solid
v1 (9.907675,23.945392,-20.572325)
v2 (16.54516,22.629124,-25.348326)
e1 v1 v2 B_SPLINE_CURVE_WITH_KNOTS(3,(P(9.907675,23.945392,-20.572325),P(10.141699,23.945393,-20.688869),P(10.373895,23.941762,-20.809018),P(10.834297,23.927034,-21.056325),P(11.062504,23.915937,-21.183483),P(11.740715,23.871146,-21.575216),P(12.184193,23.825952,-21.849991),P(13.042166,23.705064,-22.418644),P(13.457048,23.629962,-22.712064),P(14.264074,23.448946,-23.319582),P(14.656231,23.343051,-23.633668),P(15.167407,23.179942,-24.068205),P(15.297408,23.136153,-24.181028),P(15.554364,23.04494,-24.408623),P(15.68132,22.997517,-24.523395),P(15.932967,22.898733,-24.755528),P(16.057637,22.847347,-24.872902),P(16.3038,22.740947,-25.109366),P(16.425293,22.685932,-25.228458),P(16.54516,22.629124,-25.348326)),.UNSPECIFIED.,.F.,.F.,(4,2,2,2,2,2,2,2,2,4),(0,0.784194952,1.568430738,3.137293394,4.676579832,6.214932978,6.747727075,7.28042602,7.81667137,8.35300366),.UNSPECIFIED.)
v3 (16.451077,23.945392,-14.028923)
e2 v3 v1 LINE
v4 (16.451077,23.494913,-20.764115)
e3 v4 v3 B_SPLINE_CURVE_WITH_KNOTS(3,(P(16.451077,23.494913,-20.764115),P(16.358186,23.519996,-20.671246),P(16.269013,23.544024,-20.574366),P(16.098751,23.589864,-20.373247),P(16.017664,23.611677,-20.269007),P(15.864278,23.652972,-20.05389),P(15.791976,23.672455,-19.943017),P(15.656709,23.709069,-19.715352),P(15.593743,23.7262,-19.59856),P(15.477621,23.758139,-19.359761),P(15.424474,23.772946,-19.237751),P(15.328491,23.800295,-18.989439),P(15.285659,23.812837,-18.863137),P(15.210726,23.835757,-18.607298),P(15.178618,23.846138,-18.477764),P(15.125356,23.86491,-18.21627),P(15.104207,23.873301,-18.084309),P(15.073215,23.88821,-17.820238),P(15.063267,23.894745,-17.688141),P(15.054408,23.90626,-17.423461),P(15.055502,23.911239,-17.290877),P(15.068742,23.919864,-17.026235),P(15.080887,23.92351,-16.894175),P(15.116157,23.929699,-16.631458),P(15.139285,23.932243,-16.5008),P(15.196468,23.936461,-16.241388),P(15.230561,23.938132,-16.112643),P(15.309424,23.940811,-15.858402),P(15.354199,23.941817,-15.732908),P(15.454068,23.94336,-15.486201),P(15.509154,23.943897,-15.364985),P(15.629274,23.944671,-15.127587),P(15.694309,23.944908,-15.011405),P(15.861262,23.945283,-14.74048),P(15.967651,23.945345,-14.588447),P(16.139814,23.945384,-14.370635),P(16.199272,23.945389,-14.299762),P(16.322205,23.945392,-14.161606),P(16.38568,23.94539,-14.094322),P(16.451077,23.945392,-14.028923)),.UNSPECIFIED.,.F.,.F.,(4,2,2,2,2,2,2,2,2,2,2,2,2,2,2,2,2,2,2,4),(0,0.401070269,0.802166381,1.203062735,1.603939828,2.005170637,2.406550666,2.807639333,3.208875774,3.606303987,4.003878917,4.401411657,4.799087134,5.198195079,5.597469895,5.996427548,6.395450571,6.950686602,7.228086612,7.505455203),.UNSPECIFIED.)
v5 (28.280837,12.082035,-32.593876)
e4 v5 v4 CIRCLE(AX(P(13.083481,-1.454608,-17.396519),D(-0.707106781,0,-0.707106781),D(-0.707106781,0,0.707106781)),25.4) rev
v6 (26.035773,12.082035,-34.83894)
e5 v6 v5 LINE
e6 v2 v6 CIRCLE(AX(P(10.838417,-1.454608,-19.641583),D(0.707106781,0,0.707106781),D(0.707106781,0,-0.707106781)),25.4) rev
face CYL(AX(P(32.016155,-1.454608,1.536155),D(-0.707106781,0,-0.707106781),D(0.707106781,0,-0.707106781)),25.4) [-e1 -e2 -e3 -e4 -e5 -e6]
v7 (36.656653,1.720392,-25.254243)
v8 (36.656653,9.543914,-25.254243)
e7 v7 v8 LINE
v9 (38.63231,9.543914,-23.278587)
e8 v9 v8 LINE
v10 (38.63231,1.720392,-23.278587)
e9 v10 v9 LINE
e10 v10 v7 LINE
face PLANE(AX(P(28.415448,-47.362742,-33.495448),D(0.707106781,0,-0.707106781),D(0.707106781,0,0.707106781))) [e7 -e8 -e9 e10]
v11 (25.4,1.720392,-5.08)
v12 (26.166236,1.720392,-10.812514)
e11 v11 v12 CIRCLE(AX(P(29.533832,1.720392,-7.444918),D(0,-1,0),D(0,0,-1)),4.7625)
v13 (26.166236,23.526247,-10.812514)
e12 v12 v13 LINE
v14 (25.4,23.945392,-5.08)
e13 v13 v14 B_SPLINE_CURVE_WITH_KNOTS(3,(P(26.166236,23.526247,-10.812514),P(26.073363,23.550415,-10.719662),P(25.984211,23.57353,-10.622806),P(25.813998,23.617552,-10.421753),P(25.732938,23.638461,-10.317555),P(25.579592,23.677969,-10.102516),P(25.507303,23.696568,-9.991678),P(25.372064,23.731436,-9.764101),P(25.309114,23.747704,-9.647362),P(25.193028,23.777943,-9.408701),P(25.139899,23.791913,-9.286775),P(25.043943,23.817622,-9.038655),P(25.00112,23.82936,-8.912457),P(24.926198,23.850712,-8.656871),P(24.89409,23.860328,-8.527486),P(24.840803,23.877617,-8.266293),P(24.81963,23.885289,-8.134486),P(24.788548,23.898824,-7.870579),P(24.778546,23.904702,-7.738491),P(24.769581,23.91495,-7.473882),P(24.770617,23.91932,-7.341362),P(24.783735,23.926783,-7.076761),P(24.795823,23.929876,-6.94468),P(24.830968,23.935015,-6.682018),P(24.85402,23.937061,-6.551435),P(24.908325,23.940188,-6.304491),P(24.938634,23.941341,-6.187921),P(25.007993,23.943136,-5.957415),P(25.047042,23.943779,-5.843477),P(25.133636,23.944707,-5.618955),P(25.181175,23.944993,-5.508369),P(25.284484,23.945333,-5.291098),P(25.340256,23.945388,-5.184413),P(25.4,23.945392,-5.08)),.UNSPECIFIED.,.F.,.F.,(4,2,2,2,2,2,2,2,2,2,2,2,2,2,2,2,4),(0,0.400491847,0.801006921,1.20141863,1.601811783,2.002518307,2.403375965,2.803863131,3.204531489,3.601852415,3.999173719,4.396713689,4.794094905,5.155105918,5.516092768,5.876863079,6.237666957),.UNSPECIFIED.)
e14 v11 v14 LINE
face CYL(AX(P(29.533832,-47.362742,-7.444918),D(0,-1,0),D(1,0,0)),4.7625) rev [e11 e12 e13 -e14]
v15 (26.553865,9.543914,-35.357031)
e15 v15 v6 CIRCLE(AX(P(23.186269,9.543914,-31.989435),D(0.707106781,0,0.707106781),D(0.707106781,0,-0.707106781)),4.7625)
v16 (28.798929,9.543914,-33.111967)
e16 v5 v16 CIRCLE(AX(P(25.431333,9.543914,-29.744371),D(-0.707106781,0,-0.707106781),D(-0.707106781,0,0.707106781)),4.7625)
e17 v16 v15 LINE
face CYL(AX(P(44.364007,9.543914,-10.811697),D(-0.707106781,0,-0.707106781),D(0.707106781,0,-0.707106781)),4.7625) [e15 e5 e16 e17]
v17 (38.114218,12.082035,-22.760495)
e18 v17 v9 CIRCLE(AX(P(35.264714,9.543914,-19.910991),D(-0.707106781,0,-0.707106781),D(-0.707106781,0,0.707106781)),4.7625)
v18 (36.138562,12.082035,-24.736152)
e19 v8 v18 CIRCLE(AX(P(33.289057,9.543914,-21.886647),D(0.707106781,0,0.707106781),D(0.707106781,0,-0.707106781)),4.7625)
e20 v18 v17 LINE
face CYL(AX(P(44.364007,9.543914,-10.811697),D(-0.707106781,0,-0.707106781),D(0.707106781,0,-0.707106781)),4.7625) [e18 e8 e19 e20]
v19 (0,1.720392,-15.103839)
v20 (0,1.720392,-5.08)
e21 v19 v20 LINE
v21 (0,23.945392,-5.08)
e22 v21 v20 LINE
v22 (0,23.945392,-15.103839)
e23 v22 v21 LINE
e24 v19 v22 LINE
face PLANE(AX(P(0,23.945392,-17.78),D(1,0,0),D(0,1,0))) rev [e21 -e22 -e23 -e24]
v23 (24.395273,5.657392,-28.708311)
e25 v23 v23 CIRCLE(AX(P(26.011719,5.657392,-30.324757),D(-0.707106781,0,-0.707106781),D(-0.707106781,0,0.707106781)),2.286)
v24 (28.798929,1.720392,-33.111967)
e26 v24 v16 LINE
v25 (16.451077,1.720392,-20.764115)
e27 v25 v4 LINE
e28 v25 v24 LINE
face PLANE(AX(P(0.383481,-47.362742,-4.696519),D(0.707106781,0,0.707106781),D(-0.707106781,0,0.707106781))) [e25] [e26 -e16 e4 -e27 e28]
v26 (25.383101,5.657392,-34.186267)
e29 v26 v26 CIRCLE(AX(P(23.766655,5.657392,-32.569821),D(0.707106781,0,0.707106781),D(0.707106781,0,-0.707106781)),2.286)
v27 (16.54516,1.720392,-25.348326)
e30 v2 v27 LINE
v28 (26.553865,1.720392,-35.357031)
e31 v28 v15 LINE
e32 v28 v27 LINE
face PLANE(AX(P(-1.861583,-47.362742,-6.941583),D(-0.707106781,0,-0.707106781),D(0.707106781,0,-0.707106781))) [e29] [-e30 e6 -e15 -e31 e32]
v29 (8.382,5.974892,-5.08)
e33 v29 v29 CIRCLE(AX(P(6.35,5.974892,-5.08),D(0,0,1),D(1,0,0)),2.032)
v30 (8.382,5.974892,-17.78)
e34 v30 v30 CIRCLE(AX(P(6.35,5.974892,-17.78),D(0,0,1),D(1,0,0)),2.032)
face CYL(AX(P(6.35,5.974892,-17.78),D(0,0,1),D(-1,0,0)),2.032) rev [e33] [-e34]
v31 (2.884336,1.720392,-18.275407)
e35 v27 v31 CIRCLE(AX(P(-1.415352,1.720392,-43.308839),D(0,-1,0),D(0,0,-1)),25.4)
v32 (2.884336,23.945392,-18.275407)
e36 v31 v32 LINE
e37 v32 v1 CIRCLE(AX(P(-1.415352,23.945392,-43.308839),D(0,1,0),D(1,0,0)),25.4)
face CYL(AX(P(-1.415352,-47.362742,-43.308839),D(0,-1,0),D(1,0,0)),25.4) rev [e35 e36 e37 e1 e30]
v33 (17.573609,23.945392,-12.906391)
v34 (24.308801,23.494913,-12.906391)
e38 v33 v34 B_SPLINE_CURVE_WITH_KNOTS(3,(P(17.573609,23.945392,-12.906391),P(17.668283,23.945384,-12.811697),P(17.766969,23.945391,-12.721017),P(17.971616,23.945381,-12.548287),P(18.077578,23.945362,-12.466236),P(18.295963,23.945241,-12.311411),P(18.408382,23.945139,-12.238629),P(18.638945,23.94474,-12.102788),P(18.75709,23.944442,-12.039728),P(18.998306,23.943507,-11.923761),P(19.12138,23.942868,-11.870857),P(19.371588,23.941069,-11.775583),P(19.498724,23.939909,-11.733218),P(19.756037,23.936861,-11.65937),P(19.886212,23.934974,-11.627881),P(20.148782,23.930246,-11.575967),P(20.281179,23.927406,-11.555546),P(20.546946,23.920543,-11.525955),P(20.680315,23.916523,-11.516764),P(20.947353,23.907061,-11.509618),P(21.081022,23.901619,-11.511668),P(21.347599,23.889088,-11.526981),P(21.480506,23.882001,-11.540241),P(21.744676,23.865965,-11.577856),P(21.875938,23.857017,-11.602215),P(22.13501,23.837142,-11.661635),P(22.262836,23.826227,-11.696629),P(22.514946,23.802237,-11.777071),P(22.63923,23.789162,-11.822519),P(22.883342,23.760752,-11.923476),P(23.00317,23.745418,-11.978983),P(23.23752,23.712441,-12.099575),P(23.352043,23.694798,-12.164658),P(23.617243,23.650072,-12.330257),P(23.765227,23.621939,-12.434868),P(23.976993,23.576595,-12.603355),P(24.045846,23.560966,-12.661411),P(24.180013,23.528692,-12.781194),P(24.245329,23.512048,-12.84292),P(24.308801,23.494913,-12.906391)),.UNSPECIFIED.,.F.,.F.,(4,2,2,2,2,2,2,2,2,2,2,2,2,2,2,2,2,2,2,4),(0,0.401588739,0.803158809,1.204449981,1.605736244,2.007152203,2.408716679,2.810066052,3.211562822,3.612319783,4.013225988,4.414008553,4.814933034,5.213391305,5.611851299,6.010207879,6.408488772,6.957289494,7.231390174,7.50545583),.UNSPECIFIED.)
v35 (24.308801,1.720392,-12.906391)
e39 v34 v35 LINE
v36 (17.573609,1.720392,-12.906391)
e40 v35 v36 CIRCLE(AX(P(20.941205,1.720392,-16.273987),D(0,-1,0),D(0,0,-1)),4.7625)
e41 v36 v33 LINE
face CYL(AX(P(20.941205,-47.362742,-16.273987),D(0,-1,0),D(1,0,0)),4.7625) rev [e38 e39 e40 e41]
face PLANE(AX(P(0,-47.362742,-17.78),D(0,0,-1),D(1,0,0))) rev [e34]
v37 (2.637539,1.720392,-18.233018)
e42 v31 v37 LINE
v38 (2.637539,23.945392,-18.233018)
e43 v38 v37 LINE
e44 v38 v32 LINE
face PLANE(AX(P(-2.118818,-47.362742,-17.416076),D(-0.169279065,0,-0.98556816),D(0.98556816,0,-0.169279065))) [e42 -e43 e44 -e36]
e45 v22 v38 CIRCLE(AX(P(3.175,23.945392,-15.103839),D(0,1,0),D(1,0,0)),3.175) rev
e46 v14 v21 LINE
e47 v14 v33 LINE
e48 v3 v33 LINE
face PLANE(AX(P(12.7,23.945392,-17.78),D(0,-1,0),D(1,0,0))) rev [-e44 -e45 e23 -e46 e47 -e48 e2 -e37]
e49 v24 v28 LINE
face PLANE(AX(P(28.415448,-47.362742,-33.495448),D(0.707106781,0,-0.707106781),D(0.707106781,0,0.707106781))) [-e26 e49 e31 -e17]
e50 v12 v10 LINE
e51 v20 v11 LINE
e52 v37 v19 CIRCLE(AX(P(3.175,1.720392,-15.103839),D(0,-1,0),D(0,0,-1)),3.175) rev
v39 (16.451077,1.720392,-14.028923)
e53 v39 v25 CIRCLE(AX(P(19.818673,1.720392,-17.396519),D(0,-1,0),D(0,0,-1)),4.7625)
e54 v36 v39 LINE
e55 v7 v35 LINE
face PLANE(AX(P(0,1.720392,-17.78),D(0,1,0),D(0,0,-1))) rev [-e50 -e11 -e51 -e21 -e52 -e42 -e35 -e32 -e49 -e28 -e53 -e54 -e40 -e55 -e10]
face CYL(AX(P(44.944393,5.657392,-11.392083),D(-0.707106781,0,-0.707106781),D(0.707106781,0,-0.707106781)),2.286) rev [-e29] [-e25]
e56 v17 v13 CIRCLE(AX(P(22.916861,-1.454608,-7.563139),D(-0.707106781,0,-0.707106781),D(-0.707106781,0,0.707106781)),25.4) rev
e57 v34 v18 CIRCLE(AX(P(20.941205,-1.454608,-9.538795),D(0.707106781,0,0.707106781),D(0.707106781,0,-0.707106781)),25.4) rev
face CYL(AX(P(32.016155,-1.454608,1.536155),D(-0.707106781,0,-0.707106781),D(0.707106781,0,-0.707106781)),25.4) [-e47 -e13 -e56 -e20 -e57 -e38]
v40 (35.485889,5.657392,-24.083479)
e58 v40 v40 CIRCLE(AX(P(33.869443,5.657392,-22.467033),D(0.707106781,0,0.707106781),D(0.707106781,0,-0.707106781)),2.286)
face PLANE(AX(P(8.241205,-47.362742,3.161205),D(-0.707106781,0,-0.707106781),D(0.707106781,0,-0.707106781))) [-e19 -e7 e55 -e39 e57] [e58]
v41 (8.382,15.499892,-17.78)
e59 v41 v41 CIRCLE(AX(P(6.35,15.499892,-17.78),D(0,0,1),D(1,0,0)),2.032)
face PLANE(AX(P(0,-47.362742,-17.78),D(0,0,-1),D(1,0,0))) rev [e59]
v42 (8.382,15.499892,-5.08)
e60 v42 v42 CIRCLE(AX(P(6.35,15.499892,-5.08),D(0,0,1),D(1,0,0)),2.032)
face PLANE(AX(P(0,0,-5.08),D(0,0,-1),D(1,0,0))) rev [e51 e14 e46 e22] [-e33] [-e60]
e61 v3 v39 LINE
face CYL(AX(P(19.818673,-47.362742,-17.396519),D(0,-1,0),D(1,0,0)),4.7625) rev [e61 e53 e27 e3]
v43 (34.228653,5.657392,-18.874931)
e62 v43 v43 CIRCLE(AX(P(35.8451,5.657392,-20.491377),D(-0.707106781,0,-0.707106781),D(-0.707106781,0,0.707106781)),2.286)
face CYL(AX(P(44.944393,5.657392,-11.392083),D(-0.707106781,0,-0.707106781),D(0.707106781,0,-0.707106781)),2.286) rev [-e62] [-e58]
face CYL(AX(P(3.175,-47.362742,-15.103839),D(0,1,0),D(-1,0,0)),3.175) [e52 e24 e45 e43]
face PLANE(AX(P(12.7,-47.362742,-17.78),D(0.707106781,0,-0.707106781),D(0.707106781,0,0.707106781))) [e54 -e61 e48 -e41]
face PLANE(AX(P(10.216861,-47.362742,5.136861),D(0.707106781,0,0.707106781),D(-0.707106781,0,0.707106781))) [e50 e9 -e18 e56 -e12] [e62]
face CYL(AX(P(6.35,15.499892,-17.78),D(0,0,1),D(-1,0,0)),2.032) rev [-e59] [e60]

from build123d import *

# Parameters (mm, degrees)
SKETCH2_W               = 12.7
SKETCH2_H               = 22.225
SKETCH2_R               = 2.032
BOSS_EXTRUDE1_DEPTH     = 12.7
BOSS_EXTRUDE2_DEPTH     = 22.225
CUT_EXTRUDE1_DEPTH      = 55.959756427
CUT_EXTRUDE1_DEPTH_BACK = 55.959756427
SKETCH5_R               = 2.286
CUT_EXTRUDE2_DEPTH      = 55.959756427
CUT_EXTRUDE2_DEPTH_BACK = 55.959756427
FILLET1_START           = -2.63267612
FILLET1_DEPTH           = 17.0815
FILLET1_START_2         = 1.720391704
FILLET1_2_DEPTH         = 23.279608296
FILLET1_3_DEPTH         = 22.225
FILLET1_START_3         = -3.948943888
FILLET1_4_DEPTH         = 21.90945623


with BuildPart() as part:
    # Sketch2 → Boss-Extrude1 (new body)
    with BuildSketch(Plane.XY):
        with Locations((6.35, 12.832891704)):
            Rectangle(SKETCH2_W, SKETCH2_H)
        with Locations((6.35, 15.499891704)):
            Circle(SKETCH2_R, mode=Mode.SUBTRACT)
        with Locations((6.35, 5.974891704)):
            Circle(SKETCH2_R, mode=Mode.SUBTRACT)
    extrude(amount=BOSS_EXTRUDE1_DEPTH)

    # Sketch4 → Boss-Extrude2 (add)
    with BuildSketch(Plane(origin=(0, 23.945391704, 0), x_dir=(1, 0, 0), z_dir=(0, 1, 0))):
        Polygon((28.798929105, -28.031967319), (13.083480893, -12.316519107), (20.941204999, -4.458795001), (36.656653211, -20.174243213), (38.632309558, -18.198586866), (22.916861346, -2.483138654), (25.4, 0), (12.7, 0), (12.7, -12.7), (0, -12.7), (10.838416863, -14.561583137), (26.553865075, -30.277031349), align=None)
    extrude(amount=-BOSS_EXTRUDE2_DEPTH)

    # Sketch5 → Cut-Extrude1 (cut, two sides: drawn at the far end of the back side and taken through both)
    with BuildSketch(Plane(origin=(-1.861583137, 0, 1.861583137), x_dir=(0.7071067811865527, 0, 0.7071067811865424), z_dir=(-0.7071067811865424, 0, 0.7071067811865527)).offset(-CUT_EXTRUDE1_DEPTH_BACK)):
        with Locations((36.243802071, 5.657391696)):
            Circle(SKETCH5_R)
    extrude(amount=CUT_EXTRUDE1_DEPTH + CUT_EXTRUDE1_DEPTH_BACK, mode=Mode.SUBTRACT)

    # Sketch6 → Cut-Extrude2 (cut, two sides: drawn at the far end of the back side and taken through both)
    with BuildSketch(Plane(origin=(-1.861583137, 0, 1.861583137), x_dir=(0.7071067811865527, 0, 0.7071067811865424), z_dir=(-0.7071067811865424, 0, 0.7071067811865527)).offset(-CUT_EXTRUDE2_DEPTH_BACK)):
        with BuildLine():
            Line((17.960512242, 23.945391704), (40.185512242, 23.945391704))
            Line((40.185512242, 23.945391704), (40.185512242, 10.842113828))
            ThreePointArc((40.185512242, 10.842113828), (30.860575382, 20.425710965), (17.960512242, 23.945391704))
        make_face()
    extrude(amount=CUT_EXTRUDE2_DEPTH + CUT_EXTRUDE2_DEPTH_BACK, mode=Mode.SUBTRACT)

    # Fillet1: read off the stored shape, not the designer's step
    # Fillet1 outline → Fillet1 (cut)
    with BuildSketch(Plane(origin=(0, 0, 0), x_dir=(0.707106781186553, 0, 0.707106781186542), z_dir=(0.707106781186542, 0, -0.707106781186553)).offset(FILLET1_START)):
        with BuildLine():
            Line((40.185512242, -10.842113828), (40.185512242, -9.543914332))
            ThreePointArc((40.185512242, -9.543914332), (39.998674237, -10.864794174), (39.452819934, -12.082034938))
            ThreePointArc((39.452819934, -12.082034938), (39.827956058, -11.467268539), (40.185512242, -10.842113828))
        make_face()
    extrude(amount=FILLET1_DEPTH, mode=Mode.SUBTRACT)

    # Fillet1 2 outline → Fillet1 2 (cut)
    with BuildSketch(Plane(origin=(0, 0, 0), x_dir=(1, 0, 0), z_dir=(0, 1, 0)).offset(FILLET1_START_2)):
        with BuildLine():
            ThreePointArc((2.63753897, -13.153018013), (0.747340245, -12.070077877), (0, -10.023839104))
            Line((0, -10.023839104), (0, -12.7))
            Line((0, -12.7), (2.63753897, -13.153018013))
        make_face()
    extrude(amount=FILLET1_2_DEPTH, mode=Mode.SUBTRACT)

    # Fillet1 3 outline → Fillet1 3 (add)
    with BuildSketch(Plane(origin=(0, 0, 0), x_dir=(1, 0, 0), z_dir=(0, 1, 0)).offset(FILLET1_START_2)):
        with BuildLine():
            Line((10.838416863, -14.561583137), (2.884336106, -13.195407357))
            ThreePointArc((2.884336106, -13.195407357), (10.263075725, -15.672812319), (16.545160109, -20.268326383))
            Line((16.545160109, -20.268326383), (10.838416863, -14.561583137))
        make_face()
        with BuildLine():
            Line((22.916861346, -2.483138654), (26.166236401, -5.732513709))
            ThreePointArc((26.166236401, -5.732513709), (24.81331492, -2.995885603), (25.4, 0))
            Line((25.4, 0), (22.916861346, -2.483138654))
        make_face()
        with BuildLine():
            Line((20.941204999, -4.458795001), (17.573608954, -7.826391046))
            ThreePointArc((17.573608954, -7.826391046), (20.941205, -6.431487092), (24.308801045, -7.826391046))
            Line((24.308801045, -7.826391046), (20.941204999, -4.458795001))
        make_face()
        with BuildLine():
            ThreePointArc((16.451076939, -15.684115152), (15.056172984, -12.316519106), (16.451076939, -8.948923061))
            Line((16.451076939, -8.948923061), (13.083480893, -12.316519107))
            Line((13.083480893, -12.316519107), (16.451076939, -15.684115152))
        make_face()
    extrude(amount=FILLET1_3_DEPTH)

    # Fillet1 4 outline → Fillet1 4 (cut)
    with BuildSketch(Plane(origin=(0, 0, 0), x_dir=(0.707106781186553, 0, 0.707106781186542), z_dir=(0.707106781186542, 0, -0.707106781186553)).offset(FILLET1_START_3)):
        with BuildLine():
            Line((17.960512242, -23.945391704), (26.031065938, -23.945391704))
            Line((26.031065938, -23.945391704), (26.031065938, -22.629124036))
            ThreePointArc((26.031065938, -22.629124036), (22.049106057, -23.61416512), (17.960512242, -23.945391704))
        make_face()
    extrude(amount=FILLET1_4_DEPTH, mode=Mode.SUBTRACT)


with BuildPart() as body_2:
    # Mirror3: mirrored copy
    add(part.part.mirror(Plane(origin=(0, 0, -2.54), x_dir=(1, 0, 0), z_dir=(0, 0, -1))))


solid = body_2.part
